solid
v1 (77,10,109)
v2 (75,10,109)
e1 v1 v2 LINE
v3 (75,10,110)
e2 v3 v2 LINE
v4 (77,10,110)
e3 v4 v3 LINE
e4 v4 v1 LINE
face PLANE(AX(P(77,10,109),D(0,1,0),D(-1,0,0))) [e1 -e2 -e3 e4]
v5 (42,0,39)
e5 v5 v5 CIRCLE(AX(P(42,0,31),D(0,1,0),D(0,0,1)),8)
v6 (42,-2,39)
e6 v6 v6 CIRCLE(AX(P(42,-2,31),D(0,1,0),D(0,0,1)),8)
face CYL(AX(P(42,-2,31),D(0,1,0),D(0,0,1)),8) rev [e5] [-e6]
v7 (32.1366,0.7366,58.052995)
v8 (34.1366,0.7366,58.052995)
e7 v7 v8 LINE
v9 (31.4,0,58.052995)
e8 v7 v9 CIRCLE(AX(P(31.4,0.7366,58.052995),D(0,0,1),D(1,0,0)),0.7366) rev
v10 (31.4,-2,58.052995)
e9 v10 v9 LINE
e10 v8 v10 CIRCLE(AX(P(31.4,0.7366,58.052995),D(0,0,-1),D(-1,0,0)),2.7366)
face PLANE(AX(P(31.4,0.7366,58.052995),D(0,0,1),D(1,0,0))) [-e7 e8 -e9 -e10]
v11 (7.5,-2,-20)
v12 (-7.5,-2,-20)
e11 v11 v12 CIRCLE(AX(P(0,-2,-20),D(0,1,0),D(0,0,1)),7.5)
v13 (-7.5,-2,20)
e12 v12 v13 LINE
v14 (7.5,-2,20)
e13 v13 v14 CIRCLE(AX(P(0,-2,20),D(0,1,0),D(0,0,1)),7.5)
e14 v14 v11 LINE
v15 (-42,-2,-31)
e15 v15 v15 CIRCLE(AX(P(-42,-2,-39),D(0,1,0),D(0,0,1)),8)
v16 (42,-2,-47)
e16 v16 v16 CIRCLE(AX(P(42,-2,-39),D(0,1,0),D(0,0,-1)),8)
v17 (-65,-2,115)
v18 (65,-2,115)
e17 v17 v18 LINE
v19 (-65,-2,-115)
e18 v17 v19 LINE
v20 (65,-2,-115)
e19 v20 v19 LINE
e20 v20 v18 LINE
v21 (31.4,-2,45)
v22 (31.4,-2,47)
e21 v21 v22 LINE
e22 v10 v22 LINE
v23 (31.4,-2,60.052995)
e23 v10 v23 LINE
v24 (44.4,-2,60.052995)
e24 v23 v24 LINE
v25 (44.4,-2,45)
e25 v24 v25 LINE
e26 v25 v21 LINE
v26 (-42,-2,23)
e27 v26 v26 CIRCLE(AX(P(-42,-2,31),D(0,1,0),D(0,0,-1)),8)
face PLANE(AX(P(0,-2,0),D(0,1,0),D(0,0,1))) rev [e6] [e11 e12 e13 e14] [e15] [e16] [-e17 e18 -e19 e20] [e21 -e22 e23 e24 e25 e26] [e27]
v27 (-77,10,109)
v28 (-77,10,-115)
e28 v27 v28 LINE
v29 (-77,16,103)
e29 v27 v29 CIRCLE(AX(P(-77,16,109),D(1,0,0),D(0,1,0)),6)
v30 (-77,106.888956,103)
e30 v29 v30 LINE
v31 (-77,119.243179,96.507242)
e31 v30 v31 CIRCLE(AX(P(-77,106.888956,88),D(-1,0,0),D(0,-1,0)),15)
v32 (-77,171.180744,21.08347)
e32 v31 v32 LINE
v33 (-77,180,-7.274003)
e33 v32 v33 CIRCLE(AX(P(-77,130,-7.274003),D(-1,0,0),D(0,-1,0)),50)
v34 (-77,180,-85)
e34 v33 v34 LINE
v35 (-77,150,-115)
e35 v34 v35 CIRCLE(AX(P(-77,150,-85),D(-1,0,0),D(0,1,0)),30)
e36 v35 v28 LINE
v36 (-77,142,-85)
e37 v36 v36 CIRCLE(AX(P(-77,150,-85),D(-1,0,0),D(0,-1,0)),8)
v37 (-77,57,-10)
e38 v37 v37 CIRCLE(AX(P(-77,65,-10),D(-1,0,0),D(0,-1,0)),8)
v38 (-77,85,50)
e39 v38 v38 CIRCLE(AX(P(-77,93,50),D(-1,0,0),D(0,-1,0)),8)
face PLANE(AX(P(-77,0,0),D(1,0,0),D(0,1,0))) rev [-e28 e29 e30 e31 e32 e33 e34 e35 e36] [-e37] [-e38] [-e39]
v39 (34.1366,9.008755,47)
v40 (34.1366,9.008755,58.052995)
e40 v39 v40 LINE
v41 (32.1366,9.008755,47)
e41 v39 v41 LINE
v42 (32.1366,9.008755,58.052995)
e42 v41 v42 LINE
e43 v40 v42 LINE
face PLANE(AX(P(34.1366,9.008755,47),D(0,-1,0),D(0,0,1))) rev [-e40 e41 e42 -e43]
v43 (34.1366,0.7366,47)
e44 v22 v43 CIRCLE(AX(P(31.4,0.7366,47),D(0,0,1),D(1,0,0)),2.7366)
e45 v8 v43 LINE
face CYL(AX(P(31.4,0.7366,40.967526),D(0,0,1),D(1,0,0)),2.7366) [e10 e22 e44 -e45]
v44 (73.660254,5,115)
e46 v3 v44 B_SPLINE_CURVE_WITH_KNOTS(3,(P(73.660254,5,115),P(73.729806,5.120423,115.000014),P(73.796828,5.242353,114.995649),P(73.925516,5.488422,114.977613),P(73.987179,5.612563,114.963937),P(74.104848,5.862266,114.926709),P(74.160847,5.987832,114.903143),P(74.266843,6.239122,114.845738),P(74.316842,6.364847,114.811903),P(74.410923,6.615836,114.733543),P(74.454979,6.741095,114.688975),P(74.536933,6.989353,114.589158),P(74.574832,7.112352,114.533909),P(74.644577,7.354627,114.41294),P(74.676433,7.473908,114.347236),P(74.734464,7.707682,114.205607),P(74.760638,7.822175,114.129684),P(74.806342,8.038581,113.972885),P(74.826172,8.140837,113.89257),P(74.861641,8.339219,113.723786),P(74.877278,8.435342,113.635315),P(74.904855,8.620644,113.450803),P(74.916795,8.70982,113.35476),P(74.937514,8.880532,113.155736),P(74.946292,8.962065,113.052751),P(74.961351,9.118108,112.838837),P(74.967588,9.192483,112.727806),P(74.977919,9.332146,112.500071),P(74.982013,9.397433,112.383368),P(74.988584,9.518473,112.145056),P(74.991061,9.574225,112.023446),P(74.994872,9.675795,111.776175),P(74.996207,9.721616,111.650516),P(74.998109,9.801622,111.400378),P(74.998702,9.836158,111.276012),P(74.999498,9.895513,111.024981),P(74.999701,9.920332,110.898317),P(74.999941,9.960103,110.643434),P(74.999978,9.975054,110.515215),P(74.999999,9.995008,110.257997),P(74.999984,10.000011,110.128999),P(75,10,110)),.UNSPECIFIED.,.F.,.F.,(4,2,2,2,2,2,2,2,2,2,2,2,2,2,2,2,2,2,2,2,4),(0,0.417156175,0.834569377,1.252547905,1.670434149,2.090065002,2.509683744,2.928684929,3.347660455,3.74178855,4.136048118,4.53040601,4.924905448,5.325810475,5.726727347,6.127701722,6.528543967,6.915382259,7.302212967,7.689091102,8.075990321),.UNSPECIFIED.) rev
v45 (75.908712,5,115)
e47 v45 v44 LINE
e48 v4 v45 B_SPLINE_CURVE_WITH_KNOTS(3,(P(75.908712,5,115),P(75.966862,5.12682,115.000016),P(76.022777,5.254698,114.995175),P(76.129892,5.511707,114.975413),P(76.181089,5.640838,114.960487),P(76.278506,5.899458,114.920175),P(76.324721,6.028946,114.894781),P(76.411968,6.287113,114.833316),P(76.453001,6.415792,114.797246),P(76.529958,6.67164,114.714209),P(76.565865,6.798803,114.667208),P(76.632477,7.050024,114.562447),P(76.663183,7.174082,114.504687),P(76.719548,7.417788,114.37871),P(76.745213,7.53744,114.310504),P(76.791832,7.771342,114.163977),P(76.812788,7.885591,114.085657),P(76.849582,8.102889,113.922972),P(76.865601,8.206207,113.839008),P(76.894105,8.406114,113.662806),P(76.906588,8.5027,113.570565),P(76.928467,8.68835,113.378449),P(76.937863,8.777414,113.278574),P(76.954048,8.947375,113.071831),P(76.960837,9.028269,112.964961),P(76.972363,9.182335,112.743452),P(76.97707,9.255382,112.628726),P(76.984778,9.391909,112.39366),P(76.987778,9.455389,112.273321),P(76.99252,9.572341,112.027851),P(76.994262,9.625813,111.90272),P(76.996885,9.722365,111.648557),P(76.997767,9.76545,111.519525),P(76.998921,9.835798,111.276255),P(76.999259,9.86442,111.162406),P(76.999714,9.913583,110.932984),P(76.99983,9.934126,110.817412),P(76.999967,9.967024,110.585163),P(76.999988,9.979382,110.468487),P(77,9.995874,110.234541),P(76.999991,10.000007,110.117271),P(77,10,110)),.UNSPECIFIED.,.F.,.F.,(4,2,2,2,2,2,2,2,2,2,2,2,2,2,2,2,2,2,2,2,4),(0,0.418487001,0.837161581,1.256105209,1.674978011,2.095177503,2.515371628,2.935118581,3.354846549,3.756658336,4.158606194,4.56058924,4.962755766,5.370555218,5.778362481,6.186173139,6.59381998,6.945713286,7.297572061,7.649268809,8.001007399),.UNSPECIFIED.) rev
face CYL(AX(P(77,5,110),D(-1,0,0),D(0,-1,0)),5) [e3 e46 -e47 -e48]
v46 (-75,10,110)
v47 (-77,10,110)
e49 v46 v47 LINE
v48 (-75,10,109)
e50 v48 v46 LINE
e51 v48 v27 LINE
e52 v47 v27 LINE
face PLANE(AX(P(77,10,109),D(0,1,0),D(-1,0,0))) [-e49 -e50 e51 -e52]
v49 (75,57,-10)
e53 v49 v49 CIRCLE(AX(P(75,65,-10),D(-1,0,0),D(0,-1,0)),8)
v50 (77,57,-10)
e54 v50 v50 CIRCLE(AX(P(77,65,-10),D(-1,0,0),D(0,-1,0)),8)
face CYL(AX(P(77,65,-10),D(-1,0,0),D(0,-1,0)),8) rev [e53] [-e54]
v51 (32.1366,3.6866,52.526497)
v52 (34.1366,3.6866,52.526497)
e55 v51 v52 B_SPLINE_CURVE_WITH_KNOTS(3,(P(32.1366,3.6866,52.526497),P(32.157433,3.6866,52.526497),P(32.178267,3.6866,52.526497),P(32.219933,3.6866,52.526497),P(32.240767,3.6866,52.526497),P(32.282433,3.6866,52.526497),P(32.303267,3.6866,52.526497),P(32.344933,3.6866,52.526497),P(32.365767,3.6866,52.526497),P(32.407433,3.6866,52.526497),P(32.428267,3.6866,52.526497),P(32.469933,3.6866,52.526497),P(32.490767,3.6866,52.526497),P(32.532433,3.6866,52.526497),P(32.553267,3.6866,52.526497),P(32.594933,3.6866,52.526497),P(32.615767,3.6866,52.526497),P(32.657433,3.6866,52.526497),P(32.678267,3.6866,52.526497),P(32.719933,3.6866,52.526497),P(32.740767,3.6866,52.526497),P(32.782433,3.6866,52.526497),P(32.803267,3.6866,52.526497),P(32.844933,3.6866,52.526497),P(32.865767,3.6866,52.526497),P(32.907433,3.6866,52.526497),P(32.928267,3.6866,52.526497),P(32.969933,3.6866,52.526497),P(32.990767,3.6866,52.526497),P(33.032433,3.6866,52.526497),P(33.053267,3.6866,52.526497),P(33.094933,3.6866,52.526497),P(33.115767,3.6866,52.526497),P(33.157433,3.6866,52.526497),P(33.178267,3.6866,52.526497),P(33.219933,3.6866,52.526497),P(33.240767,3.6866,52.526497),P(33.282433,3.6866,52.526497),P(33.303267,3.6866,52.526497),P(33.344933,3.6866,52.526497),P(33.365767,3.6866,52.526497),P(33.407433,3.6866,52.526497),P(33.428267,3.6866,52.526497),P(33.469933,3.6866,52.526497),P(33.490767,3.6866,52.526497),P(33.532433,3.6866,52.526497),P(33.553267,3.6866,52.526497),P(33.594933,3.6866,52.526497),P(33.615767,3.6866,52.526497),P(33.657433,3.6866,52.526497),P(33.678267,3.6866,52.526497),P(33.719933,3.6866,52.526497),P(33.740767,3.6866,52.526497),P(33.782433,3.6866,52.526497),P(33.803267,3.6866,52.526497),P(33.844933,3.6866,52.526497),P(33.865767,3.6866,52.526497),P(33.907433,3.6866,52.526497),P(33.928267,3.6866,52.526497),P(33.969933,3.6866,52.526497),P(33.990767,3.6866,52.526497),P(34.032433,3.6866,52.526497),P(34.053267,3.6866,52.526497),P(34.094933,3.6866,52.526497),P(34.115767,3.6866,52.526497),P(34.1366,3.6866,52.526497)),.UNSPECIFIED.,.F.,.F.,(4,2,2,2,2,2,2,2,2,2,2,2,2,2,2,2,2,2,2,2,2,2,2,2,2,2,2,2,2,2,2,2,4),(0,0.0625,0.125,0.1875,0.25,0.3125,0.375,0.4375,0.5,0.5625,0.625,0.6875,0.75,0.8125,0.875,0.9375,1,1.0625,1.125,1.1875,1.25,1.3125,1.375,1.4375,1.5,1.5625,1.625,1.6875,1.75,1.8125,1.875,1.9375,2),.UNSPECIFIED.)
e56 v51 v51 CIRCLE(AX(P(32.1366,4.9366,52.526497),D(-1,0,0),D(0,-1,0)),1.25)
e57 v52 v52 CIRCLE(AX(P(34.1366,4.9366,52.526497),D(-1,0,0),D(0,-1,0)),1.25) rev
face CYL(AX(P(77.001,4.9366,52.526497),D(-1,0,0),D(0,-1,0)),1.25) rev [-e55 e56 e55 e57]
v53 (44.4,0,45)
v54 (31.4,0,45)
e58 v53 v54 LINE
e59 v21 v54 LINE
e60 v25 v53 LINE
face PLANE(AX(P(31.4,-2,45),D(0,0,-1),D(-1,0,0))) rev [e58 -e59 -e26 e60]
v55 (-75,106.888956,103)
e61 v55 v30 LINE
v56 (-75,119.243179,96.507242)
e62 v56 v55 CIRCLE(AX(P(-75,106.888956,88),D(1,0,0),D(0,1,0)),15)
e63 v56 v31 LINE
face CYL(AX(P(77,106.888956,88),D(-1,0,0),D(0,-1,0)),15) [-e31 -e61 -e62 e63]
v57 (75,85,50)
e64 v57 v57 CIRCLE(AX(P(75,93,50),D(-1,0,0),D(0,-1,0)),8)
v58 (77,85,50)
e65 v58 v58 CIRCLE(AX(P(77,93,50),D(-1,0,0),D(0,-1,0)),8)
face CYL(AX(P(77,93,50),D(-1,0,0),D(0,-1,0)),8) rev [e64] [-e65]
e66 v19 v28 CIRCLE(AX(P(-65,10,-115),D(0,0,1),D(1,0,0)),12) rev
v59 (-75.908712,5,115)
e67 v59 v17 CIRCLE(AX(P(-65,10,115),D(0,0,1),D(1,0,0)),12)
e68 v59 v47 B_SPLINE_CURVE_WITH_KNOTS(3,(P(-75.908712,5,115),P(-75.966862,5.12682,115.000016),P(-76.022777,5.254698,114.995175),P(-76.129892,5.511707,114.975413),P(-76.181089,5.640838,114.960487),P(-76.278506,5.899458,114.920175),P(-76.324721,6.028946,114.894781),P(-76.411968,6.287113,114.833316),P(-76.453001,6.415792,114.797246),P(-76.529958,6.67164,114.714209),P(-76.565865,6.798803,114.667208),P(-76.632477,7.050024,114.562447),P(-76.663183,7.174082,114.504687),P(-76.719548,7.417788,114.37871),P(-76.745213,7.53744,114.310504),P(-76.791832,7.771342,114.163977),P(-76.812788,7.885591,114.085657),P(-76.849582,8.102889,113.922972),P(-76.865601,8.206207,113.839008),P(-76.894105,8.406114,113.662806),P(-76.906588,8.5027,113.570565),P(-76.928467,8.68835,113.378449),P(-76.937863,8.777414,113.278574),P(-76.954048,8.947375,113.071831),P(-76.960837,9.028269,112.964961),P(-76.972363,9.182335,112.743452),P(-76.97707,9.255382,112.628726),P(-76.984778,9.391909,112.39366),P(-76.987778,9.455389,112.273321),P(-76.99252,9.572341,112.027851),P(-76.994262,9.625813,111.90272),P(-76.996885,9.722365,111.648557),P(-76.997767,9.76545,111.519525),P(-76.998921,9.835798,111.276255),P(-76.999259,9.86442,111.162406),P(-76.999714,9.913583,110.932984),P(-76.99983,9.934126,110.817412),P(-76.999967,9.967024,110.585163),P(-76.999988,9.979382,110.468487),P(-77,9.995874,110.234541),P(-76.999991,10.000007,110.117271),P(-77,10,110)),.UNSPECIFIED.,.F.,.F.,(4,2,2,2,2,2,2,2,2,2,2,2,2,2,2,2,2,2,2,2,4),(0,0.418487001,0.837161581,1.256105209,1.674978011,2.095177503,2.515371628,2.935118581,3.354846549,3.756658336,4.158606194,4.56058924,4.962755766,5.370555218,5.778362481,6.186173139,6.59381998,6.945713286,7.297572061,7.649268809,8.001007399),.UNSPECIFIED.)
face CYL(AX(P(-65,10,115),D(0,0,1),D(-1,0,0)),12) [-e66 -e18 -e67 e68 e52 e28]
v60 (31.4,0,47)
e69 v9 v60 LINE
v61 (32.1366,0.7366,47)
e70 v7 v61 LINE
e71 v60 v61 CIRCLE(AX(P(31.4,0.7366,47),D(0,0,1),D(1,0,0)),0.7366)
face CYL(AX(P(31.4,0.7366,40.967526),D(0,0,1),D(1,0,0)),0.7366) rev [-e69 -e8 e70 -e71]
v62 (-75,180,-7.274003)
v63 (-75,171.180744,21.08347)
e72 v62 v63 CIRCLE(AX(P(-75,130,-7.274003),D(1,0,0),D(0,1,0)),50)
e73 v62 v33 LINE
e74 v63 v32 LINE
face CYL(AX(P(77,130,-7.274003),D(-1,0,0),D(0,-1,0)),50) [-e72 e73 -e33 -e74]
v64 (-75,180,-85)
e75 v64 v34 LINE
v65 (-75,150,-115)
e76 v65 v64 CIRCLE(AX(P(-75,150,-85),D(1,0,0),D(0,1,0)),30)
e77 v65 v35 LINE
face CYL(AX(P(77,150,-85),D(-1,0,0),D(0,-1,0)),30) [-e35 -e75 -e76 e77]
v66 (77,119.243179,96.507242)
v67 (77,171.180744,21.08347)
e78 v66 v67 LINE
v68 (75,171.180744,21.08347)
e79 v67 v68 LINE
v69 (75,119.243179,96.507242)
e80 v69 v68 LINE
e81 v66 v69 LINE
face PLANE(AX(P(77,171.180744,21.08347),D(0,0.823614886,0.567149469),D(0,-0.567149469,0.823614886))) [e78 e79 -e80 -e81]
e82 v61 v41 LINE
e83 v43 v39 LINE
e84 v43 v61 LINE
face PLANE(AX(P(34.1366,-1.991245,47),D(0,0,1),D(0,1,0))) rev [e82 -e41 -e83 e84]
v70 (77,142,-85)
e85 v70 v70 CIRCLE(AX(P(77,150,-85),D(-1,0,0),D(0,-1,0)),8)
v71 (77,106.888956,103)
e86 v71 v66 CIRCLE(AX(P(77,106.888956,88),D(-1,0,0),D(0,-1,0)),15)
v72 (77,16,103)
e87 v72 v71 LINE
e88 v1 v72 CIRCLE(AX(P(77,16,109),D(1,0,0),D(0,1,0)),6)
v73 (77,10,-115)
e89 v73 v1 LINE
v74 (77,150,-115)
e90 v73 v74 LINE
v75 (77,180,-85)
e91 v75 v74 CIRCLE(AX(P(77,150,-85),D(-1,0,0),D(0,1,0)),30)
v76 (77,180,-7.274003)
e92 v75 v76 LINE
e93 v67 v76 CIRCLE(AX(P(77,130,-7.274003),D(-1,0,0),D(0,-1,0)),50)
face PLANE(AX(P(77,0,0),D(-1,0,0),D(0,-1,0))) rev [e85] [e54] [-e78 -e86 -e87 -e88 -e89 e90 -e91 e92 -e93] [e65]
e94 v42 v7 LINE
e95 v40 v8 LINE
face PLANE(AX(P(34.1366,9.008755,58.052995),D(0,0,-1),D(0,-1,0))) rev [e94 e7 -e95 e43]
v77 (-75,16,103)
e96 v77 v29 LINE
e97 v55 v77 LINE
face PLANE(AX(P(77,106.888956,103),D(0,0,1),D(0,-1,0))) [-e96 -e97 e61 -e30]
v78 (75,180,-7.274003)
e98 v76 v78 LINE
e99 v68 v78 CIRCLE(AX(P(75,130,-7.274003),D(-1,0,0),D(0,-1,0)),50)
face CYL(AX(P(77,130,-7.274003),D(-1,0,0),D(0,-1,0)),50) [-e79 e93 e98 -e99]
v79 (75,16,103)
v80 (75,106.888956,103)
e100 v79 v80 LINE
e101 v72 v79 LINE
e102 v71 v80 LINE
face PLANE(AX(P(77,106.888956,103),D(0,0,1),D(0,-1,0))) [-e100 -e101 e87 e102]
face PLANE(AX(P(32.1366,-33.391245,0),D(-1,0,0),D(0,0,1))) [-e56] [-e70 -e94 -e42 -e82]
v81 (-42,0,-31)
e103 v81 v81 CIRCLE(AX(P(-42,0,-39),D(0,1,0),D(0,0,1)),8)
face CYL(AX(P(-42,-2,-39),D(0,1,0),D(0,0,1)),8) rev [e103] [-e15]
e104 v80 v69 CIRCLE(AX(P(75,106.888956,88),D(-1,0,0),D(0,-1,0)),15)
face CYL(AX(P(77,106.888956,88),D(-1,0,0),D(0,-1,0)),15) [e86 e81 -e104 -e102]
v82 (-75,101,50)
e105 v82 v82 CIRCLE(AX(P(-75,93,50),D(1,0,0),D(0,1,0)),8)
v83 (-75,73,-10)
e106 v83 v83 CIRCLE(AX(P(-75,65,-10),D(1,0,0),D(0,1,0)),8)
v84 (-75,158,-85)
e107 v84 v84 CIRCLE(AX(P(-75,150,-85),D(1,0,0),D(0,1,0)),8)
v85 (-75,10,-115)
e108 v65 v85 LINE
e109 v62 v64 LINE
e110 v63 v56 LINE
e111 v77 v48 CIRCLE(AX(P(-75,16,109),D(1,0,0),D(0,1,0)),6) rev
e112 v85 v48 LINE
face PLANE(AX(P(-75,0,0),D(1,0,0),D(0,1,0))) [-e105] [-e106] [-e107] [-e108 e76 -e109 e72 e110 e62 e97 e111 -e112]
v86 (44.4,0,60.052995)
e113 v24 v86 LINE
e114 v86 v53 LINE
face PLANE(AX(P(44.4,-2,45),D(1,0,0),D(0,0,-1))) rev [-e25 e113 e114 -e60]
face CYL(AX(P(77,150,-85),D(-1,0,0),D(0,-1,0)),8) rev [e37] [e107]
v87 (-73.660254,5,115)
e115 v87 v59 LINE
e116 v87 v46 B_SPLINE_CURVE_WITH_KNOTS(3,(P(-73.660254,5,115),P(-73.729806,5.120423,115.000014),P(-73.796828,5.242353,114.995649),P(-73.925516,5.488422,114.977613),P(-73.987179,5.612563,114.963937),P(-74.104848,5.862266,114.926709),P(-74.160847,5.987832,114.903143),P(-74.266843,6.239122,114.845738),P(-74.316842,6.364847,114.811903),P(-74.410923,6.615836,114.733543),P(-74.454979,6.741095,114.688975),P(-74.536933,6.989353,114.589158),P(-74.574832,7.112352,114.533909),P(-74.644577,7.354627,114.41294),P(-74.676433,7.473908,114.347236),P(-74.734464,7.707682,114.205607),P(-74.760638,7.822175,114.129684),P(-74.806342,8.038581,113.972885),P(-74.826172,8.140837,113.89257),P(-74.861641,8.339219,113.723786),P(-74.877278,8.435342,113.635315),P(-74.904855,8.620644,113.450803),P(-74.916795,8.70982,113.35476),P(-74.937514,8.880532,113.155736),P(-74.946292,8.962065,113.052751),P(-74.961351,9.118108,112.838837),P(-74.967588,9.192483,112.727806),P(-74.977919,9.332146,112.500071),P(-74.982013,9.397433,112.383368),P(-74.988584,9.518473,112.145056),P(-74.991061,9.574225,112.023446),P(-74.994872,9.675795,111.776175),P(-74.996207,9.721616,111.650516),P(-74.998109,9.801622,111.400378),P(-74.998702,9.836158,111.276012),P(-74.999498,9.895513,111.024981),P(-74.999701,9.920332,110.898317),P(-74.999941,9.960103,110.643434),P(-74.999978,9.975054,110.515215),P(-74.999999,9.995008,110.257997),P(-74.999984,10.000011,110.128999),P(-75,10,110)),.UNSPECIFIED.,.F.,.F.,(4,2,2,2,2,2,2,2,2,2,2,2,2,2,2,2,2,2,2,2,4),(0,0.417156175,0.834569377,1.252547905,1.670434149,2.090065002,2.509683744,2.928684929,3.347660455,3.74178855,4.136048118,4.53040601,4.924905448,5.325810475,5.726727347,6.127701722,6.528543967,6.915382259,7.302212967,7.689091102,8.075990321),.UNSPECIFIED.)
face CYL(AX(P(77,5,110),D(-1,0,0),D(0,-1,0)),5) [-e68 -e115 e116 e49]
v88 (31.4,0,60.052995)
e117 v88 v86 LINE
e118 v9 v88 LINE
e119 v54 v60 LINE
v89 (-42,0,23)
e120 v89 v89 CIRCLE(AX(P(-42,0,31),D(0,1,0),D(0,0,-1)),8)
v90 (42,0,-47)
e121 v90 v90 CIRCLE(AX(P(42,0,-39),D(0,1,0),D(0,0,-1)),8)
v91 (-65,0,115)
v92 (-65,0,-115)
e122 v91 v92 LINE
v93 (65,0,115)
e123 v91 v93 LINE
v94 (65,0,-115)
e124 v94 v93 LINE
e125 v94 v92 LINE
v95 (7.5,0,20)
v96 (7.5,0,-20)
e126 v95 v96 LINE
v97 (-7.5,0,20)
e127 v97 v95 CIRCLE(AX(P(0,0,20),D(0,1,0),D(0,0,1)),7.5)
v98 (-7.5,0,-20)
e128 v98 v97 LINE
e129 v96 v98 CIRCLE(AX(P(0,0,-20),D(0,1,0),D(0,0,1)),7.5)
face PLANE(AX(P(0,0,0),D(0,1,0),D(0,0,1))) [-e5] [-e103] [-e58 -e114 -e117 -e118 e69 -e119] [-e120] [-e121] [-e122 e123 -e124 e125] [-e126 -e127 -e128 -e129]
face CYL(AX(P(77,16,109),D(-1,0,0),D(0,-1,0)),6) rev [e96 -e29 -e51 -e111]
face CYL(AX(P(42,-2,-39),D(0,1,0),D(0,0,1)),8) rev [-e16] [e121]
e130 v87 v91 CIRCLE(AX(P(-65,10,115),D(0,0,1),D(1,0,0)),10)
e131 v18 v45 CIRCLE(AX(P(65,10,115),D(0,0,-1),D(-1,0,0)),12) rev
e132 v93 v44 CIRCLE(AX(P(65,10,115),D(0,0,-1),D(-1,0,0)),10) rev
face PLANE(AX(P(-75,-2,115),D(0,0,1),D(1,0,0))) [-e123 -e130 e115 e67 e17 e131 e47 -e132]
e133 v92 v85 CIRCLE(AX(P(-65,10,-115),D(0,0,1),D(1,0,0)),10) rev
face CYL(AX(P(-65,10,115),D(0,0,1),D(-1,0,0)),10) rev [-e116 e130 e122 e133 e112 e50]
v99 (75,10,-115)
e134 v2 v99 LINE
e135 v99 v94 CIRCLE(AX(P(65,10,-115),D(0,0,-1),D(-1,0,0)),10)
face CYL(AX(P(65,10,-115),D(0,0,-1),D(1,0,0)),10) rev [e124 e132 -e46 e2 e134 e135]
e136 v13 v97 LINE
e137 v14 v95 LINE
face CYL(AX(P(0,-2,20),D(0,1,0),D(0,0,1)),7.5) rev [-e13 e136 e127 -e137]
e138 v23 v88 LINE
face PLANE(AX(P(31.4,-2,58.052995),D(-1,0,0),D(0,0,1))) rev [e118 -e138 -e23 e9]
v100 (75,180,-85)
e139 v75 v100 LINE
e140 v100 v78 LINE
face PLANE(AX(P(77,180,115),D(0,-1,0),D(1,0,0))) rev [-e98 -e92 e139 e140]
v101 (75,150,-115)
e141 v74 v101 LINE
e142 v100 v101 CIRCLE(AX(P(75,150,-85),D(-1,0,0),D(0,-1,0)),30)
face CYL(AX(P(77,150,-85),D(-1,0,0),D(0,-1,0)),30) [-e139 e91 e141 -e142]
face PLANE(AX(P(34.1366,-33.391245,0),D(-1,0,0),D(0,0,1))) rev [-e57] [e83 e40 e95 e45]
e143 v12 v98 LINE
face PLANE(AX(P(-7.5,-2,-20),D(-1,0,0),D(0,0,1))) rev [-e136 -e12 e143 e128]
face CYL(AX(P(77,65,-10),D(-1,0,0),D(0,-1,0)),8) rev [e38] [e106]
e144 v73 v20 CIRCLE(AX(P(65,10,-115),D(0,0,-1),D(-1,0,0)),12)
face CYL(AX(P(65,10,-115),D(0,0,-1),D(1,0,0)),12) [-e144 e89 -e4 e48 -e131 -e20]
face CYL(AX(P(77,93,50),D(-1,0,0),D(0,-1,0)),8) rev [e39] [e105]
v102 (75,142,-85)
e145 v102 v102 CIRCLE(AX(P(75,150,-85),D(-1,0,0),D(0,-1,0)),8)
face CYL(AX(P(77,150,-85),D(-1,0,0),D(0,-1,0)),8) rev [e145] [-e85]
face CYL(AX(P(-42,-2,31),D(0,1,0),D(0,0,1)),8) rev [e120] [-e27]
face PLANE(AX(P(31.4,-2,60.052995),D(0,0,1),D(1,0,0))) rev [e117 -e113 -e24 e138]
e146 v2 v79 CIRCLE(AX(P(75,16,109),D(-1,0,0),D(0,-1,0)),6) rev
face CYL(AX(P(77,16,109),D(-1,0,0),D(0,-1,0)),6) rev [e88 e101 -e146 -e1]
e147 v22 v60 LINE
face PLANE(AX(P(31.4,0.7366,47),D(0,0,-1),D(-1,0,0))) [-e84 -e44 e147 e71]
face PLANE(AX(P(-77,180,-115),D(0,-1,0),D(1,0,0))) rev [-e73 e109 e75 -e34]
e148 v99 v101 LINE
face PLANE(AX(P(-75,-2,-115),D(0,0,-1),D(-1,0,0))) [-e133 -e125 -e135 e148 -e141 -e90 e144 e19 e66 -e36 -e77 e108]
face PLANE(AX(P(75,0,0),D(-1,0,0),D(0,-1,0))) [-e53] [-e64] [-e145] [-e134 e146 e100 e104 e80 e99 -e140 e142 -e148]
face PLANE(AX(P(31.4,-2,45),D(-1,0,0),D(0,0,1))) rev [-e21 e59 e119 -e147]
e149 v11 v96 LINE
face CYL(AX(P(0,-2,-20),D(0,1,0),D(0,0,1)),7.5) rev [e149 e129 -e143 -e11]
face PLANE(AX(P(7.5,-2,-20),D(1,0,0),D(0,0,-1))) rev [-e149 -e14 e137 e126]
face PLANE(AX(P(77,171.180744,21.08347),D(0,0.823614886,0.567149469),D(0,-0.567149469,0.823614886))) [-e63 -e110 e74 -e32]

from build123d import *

# Parameters (mm, degrees)
SKETCH1_W                      = 150
SKETCH1_H                      = 230
BASE_FLANGE1_DEPTH             = 2
EDGE_FLANGE1_STRIP_W           = 28
EDGE_FLANGE1_STRIP_H           = 2
EDGE_FLANGE1_STRIP_CUT_DEPTH   = 230
EDGE_FLANGE1_STRIP_2_W         = 28
EDGE_FLANGE1_STRIP_2_H         = 2
EDGE_FLANGE1_STRIP_CUT_2_DEPTH = 230
EDGE_FLANGE1_DEPTH             = 230
EDGE_FLANGE1_BEND_DEPTH        = 230
SKETCH15_OUTSIDE_W             = 298.254
SKETCH15_OUTSIDE_H             = 250.254
SKETCH15_OUTSIDE_R             = 8
CUT_EXTRUDE1_DEPTH             = 264.326793168
SKETCH16_R                     = 8
CUT_EXTRUDE2_DEPTH             = 228.055059487
CUT_EXTRUDE3_DEPTH             = 228.055059487
SKETCHED_START                 = 47
SKETCHED_BEND1_DEPTH           = 11.052994728
SKETCHED_BEND1_2_DEPTH         = 11.052994728
CUT_EXTRUDE4_REACH             = 241.866
SKETCH20_R                     = 1.25


# Read off the part's stored shape, not the designer's step: Sketched Bend1
# Sheet-metal steps are written as plain solids
with BuildPart() as part:
    # Sketch1 → Base-Flange1 (new body)
    with BuildSketch(Plane(origin=(0, 0, 0), x_dir=(1, 0, 0), z_dir=(0, 1, 0))):
        Rectangle(SKETCH1_W, SKETCH1_H)
    extrude(amount=-BASE_FLANGE1_DEPTH)

    # Edge-Flange1 strip (across the edge) → Edge-Flange1 strip cut (cut)
    with BuildSketch(Plane(origin=(75, 0, 115), x_dir=(-1, 0, 0), z_dir=(0, 0, -1))):
        with Locations((-4, -1)):
            Rectangle(EDGE_FLANGE1_STRIP_W, EDGE_FLANGE1_STRIP_H)
    extrude(amount=EDGE_FLANGE1_STRIP_CUT_DEPTH, mode=Mode.SUBTRACT)

    # Edge-Flange1 strip 2 (across the edge) → Edge-Flange1 strip cut 2 (cut)
    with BuildSketch(Plane(origin=(-75, 0, -115), x_dir=(1, 0, 0), z_dir=(0, 0, 1))):
        with Locations((-4, -1)):
            Rectangle(EDGE_FLANGE1_STRIP_2_W, EDGE_FLANGE1_STRIP_2_H)
    extrude(amount=EDGE_FLANGE1_STRIP_CUT_2_DEPTH, mode=Mode.SUBTRACT)

    # Edge-Flange1 section (across the edge) → Edge-Flange1 (add)
    with BuildSketch(Plane(origin=(75, 0, 115), x_dir=(-1, 0, 0), z_dir=(0, 0, -1))):
        with BuildLine():
            Line((-2, 10), (-2, 180))
            Line((-2, 180), (0, 180))
            Line((0, 180), (0, 10))
            ThreePointArc((0, 10), (2.928932188, 2.928932188), (10, 0))
            Line((10, 0), (10, -2))
            ThreePointArc((10, -2), (1.514718626, 1.514718626), (-2, 10))
        make_face()
    extrude(amount=EDGE_FLANGE1_DEPTH)

    # Edge-Flange1 section 2 (across the edge) → Edge-Flange1 bend (add)
    with BuildSketch(Plane(origin=(-75, 0, -115), x_dir=(1, 0, 0), z_dir=(0, 0, 1))):
        with BuildLine():
            Line((-2, 10), (-2, 180))
            Line((-2, 180), (0, 180))
            Line((0, 180), (0, 10))
            ThreePointArc((0, 10), (2.928932188, 2.928932188), (10, 0))
            Line((10, 0), (10, -2))
            ThreePointArc((10, -2), (1.514718626, 1.514718626), (-2, 10))
        make_face()
    extrude(amount=EDGE_FLANGE1_BEND_DEPTH)

    # Sketch15 outside → Cut-Extrude1 (cut, through all)
    # profile 1 of 4: a face of its own
    with BuildSketch(Plane.ZY.offset(77)):
        with Locations((0, 89)):
            Rectangle(SKETCH15_OUTSIDE_W, SKETCH15_OUTSIDE_H)
        with BuildLine():
            Line((21.083470393, 171.180744276), (96.507242037, 119.243178795))
            ThreePointArc((96.507242037, 119.243178795), (101.277963521, 113.867184852), (103, 106.888955512))
            Line((103, 106.888955512), (103, 16))
            ThreePointArc((103, 16), (104.757359313, 11.757359313), (109, 10))
            Line((109, 10), (110, 10))
            ThreePointArc((110, 10), (113.535533906, 8.535533906), (115, 5))
            Line((115, 5), (115, -2))
            Line((115, -2), (-115, -2))
            Line((-115, -2), (-115, 99))
            Line((-115, 99), (-115, 150))
            ThreePointArc((-115, 150), (-106.213203436, 171.213203436), (-85, 180))
            Line((-85, 180), (-7.274003064, 180))
            ThreePointArc((-7.274003064, 180), (7.574612801, 177.744304445), (21.083470393, 171.180744276))
        make_face(mode=Mode.SUBTRACT)
    # profile 2 of 4: a face of its own
    with BuildSketch(Plane.ZY.offset(77)):
        with Locations(Location((50, 93, 0), (0, 0, 270))):
            Circle(SKETCH15_OUTSIDE_R)
    # profile 3 of 4: a face of its own
    with BuildSketch(Plane.ZY.offset(77)):
        with Locations(Location((-85, 150, 0), (0, 0, 270))):
            Circle(SKETCH15_OUTSIDE_R)
    # profile 4 of 4: a face of its own
    with BuildSketch(Plane.ZY.offset(77)):
        with Locations(Location((-10, 65, 0), (0, 0, 270))):
            Circle(SKETCH15_OUTSIDE_R)
    extrude(amount=-CUT_EXTRUDE1_DEPTH, mode=Mode.SUBTRACT)

    # Sketch16 → Cut-Extrude2 (cut, through all)
    with BuildSketch(Plane(origin=(0, 0, 0), x_dir=(1, 0, 0), z_dir=(0, 1, 0))):
        with Locations(Location((-42, 39, 0), (0, 0, 270))):
            Circle(SKETCH16_R)
        with Locations(Location((42, 39, 0), (0, 0, 90))):
            Circle(SKETCH16_R)
        with Locations(Location((-42, -31, 0), (0, 0, 90))):
            Circle(SKETCH16_R)
        with Locations(Location((42, -31, 0), (0, 0, 270))):
            Circle(SKETCH16_R)
        with BuildLine():
            Line((7.5, 20), (7.5, -20))
            ThreePointArc((7.5, -20), (0, -27.5), (-7.5, -20))
            Line((-7.5, -20), (-7.5, 20))
            ThreePointArc((-7.5, 20), (0, 27.5), (7.5, 20))
        make_face()
    extrude(amount=-CUT_EXTRUDE2_DEPTH, mode=Mode.SUBTRACT)

    # Sketch18 → Cut-Extrude3 (cut, through all)
    with BuildSketch(Plane(origin=(0, 0, 0), x_dir=(1, 0, 0), z_dir=(0, 1, 0))):
        Polygon((31.4, -45), (44.4, -45), (44.4, -60.052994728), (31.4, -60.052994728), (31.4, -58.052994728), (42.4, -58.052994728), (42.4, -47), (31.4, -47), align=None)
    extrude(amount=-CUT_EXTRUDE3_DEPTH, mode=Mode.SUBTRACT)

    # Sketched Bend1 outline → Sketched Bend1 (cut)
    with BuildSketch(Plane.XY.offset(SKETCHED_START)):
        with BuildLine():
            ThreePointArc((34.035602398, 0), (33.054267209, -1.443395312), (31.4, -2))
            Line((31.4, -2), (42.4, -2))
            Line((42.4, -2), (42.4, 0))
            Line((42.4, 0), (34.035602398, 0))
        make_face()
    extrude(amount=SKETCHED_BEND1_DEPTH, mode=Mode.SUBTRACT)

    # Sketched Bend1 2 outline → Sketched Bend1 2 (add)
    with BuildSketch(Plane.XY.offset(SKETCHED_START)):
        with BuildLine():
            Line((31.4, 0), (34.035602398, 0))
            ThreePointArc((34.035602398, 0), (34.111233029, 0.364854094), (34.1366, 0.7366))
            Line((34.1366, 0.7366), (34.1366, 9.008755099))
            Line((34.1366, 9.008755099), (32.1366, 9.008755099))
            Line((32.1366, 9.008755099), (32.1366, 0.7366))
            ThreePointArc((32.1366, 0.7366), (31.920854855, 0.215745145), (31.4, 0))
        make_face()
    extrude(amount=SKETCHED_BEND1_2_DEPTH)

    # Sketch20 → Cut-Extrude4 (cut, up to next)
    with BuildSketch(Plane.ZY.offset(-32.1366), mode=Mode.PRIVATE) as cut_extrude4_sk1:
        with Locations(Location((52.526497364, 4.9366, 0), (0, 0, 270))):
            Circle(SKETCH20_R)
    cut_extrude4_tool1 = extrude(cut_extrude4_sk1.sketch, amount=-CUT_EXTRUDE4_REACH, mode=Mode.PRIVATE) & part.part
    add(cut_extrude4_tool1.solids().sort_by_distance((32.1366, 4.9366, 52.526497))[0], mode=Mode.SUBTRACT)


solid = part.part
